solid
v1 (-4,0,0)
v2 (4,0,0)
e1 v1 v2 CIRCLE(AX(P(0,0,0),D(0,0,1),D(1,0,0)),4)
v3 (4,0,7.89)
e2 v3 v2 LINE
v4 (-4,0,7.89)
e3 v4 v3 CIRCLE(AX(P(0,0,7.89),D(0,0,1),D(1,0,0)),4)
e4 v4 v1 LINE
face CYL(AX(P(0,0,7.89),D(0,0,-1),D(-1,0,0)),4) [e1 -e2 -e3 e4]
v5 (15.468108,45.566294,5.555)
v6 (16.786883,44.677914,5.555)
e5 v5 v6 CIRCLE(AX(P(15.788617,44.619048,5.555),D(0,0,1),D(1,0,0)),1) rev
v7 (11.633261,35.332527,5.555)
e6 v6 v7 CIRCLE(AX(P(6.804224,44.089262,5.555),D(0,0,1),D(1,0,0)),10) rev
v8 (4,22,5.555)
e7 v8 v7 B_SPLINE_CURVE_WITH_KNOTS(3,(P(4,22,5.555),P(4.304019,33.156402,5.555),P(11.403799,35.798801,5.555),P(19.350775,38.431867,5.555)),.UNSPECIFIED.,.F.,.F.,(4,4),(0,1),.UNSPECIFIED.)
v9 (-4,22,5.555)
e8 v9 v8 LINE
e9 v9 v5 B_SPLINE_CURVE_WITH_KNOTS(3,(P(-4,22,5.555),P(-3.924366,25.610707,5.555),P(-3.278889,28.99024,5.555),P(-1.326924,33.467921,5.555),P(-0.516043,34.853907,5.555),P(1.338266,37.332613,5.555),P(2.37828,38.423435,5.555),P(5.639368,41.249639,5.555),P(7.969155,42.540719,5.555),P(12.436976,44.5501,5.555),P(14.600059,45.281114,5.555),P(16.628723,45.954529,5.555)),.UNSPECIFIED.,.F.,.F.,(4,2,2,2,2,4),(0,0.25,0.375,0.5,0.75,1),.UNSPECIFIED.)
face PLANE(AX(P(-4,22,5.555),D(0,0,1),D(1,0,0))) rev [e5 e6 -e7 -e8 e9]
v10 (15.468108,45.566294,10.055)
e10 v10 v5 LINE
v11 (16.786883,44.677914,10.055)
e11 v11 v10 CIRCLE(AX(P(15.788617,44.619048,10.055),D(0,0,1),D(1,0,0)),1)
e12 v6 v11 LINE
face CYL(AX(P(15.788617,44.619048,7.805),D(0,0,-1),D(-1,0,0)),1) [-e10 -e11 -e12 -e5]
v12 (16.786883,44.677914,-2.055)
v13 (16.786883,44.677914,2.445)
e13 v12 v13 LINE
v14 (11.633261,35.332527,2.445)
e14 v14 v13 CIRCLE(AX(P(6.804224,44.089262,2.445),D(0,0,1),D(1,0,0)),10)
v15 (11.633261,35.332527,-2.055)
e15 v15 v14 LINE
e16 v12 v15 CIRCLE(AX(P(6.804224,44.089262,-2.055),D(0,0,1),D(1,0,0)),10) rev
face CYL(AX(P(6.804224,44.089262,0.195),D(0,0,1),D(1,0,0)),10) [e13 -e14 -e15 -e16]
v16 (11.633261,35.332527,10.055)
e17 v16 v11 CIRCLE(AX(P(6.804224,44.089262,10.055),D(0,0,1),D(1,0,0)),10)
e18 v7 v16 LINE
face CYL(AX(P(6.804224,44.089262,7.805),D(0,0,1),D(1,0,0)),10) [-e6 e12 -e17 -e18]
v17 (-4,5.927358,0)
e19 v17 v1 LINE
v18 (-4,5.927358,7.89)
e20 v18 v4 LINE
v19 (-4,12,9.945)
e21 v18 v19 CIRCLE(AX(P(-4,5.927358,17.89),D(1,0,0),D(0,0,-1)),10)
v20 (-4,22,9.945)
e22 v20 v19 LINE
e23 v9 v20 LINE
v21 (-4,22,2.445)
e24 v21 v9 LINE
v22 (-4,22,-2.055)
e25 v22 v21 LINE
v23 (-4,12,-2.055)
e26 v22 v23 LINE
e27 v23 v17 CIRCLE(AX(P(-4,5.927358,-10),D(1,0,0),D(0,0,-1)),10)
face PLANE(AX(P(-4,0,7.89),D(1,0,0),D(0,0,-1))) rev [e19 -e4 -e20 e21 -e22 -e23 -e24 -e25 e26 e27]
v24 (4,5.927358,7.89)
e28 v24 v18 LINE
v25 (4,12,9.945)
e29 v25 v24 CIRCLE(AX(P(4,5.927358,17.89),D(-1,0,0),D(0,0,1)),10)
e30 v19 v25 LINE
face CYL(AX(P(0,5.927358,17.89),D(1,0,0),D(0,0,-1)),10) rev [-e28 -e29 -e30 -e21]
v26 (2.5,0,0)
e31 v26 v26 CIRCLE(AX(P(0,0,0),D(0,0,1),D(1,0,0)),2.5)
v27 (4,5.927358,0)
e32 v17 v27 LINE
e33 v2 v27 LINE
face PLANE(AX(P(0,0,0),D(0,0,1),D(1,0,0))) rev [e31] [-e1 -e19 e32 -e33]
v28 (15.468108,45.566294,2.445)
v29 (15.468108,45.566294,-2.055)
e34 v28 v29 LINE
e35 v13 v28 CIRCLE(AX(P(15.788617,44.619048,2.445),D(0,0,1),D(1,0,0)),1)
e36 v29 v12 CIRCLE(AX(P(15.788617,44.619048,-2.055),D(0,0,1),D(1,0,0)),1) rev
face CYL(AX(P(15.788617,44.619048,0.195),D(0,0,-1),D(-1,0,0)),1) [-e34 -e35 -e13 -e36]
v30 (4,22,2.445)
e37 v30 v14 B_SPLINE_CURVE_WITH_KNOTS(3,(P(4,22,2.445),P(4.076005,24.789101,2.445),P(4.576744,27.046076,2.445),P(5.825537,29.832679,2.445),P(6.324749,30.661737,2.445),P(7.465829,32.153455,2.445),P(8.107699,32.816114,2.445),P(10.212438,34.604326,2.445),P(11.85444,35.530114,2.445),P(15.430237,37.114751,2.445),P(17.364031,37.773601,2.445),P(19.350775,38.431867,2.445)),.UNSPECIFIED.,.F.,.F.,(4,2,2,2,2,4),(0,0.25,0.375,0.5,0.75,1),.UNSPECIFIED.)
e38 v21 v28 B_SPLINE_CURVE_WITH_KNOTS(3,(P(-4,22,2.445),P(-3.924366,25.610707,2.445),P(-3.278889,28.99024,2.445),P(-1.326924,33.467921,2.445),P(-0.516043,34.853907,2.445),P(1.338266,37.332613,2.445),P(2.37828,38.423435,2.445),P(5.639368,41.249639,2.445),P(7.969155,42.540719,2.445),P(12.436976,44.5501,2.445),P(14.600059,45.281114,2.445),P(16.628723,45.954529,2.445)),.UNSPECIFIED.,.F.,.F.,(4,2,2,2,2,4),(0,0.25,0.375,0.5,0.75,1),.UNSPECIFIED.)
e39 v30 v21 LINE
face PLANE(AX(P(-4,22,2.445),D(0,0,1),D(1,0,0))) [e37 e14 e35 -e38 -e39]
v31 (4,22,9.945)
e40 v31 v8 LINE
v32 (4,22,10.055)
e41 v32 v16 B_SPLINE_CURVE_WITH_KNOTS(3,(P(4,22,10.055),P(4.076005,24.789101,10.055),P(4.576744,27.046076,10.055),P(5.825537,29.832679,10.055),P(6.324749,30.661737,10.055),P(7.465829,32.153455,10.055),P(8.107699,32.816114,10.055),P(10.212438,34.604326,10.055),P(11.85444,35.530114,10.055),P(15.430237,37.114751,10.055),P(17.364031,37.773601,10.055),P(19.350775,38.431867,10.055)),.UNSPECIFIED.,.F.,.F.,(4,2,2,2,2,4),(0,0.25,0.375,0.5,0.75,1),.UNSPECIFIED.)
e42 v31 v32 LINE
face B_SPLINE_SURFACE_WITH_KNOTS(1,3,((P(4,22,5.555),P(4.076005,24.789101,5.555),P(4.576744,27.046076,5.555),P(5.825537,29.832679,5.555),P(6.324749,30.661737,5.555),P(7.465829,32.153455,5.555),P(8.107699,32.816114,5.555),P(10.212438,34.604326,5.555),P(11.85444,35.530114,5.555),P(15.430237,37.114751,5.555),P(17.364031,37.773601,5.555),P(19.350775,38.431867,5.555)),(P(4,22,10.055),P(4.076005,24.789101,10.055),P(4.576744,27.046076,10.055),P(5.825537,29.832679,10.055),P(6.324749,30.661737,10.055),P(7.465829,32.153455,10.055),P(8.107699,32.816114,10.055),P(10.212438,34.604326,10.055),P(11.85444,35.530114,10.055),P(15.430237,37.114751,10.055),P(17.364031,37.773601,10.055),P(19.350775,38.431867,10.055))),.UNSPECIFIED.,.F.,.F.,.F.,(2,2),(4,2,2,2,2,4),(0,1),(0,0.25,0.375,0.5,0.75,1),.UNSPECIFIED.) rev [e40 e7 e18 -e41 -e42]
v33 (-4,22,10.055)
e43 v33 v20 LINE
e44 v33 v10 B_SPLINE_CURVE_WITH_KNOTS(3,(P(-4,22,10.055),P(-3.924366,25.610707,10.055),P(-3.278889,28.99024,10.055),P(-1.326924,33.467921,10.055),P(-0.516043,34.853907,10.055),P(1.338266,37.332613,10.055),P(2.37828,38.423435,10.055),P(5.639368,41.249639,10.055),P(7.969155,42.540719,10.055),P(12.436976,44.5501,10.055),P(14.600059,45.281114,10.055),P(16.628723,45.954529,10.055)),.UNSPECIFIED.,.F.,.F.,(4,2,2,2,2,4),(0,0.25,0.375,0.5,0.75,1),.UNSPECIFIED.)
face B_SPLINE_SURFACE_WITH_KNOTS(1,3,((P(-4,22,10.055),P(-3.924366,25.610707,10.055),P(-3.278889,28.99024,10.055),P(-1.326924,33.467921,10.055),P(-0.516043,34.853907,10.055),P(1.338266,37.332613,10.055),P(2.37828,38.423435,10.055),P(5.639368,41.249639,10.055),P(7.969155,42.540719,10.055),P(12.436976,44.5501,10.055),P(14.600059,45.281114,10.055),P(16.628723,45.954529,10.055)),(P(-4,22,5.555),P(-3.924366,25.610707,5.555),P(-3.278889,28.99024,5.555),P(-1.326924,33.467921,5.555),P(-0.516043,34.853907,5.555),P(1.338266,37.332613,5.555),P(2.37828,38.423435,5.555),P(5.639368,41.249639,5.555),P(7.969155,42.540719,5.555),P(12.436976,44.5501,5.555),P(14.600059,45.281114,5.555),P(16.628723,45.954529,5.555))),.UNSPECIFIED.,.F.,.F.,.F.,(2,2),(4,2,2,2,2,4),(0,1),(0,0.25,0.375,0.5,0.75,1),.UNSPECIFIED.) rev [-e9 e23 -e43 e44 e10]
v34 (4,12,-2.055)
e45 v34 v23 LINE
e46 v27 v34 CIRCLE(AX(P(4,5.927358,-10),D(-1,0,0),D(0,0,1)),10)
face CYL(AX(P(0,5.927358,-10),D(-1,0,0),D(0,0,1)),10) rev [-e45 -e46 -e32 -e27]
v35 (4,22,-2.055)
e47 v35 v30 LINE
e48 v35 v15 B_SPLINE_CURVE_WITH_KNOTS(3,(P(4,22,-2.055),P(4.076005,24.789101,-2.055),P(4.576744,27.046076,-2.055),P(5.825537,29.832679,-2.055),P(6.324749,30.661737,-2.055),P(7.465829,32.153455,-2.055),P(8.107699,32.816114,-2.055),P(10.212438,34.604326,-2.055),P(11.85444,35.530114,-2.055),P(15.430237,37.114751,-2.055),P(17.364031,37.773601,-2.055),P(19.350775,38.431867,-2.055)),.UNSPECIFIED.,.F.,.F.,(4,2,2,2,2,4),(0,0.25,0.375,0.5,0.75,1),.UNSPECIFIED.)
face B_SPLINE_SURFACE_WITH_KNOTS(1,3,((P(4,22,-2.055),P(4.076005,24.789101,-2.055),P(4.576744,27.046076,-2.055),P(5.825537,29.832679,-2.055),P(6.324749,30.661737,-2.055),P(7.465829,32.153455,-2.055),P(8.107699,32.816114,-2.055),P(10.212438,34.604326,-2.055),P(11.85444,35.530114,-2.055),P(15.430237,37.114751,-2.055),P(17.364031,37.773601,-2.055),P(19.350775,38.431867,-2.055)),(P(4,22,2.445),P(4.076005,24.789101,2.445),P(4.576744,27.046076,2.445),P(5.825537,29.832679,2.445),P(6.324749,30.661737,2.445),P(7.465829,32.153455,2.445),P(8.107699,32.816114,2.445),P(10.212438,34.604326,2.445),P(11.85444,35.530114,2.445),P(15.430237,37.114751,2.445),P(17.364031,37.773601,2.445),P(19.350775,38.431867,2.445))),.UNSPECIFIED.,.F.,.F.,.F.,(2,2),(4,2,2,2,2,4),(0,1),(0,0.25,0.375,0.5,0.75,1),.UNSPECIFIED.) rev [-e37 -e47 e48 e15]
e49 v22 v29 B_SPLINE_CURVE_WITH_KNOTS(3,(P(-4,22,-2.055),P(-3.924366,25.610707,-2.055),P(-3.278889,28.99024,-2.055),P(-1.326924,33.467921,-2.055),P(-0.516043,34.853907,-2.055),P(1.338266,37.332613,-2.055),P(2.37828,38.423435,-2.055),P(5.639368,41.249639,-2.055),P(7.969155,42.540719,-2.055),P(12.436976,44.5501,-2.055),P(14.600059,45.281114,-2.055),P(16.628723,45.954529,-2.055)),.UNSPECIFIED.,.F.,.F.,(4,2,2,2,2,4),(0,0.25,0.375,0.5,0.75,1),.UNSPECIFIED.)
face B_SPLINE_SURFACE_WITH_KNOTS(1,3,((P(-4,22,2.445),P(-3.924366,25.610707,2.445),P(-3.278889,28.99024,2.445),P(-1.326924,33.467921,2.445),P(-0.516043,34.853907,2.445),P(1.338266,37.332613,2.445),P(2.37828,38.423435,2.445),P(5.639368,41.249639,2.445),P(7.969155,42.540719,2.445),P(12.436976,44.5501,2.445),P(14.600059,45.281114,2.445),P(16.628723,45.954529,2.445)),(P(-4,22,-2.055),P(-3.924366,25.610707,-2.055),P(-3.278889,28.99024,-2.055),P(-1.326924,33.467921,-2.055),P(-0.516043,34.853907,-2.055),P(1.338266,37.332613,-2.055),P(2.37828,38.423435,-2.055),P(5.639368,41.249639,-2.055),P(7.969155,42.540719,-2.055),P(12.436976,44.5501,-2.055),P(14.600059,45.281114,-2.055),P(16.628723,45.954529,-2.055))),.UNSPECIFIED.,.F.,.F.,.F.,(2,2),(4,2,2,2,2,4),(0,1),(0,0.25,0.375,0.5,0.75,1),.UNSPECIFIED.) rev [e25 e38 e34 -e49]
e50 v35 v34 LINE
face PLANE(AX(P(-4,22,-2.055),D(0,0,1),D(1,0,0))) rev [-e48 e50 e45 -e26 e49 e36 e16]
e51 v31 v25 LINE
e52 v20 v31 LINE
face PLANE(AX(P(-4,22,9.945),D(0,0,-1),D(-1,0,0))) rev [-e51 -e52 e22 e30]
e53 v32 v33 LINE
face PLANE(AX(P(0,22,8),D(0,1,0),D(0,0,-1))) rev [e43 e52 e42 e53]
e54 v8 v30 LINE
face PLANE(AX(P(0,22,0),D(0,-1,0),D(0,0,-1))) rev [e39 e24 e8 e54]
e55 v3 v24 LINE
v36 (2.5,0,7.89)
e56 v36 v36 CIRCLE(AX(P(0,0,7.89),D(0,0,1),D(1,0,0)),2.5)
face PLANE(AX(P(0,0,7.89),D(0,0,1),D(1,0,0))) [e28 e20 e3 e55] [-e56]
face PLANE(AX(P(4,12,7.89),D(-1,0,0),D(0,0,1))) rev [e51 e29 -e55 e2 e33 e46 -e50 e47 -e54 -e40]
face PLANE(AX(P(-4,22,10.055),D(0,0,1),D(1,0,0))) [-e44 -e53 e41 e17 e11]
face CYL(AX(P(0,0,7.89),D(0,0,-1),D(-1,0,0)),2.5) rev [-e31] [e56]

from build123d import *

# Parameters (mm, degrees)
ESBO_O3_R                = 2.5
RESSALTO_EXTRUS_O1_DEPTH = 7.89
ESBO_O4_W                = 8
ESBO_O4_H                = 12
RESSALTO_EXTRUS_O2_DEPTH = 10
FILETE1_R                = 10
VARREDURA1_START         = -2.055
VARREDURA1_DEPTH         = 4.5
FILETE2_R                = 10
FILETE3_R                = 1
FILETE2_OF_ESPELHAR1_R   = 10
FILETE3_OF_ESPELHAR1_R   = 1


# Read off the part's stored shape, not the designer's step: Varredura1
with BuildPart() as part:
    # Esboço3 → Ressalto-extrusão1 (new body)
    with BuildSketch(Plane.XY):
        with BuildLine():
            Line((-4, 0), (-4, 12))
            Line((-4, 12), (4, 12))
            Line((4, 12), (4, 0))
            ThreePointArc((4, 0), (0, -4), (-4, 0))
        make_face()
        Circle(ESBO_O3_R, mode=Mode.SUBTRACT)
    extrude(amount=RESSALTO_EXTRUS_O1_DEPTH)

    # Esboço4 → Ressalto-extrusão2 (add)
    with BuildSketch(Plane(origin=(0, 12, 0), x_dir=(1, 0, 0), z_dir=(0, 1, 0))):
        with Locations((0, -3.945)):
            Rectangle(ESBO_O4_W, ESBO_O4_H)
    extrude(amount=RESSALTO_EXTRUS_O2_DEPTH)

    # Filete1
    # the kernel refuses this fillet: 10 mm, written as the material it adds along each edge
    with BuildSketch(Plane(origin=(-4, 12, 0), x_dir=(0, 0, -1), z_dir=(1, 0, 0))) as filete1_piece_1:
        with BuildLine():
            CenterArc((10, -6.072641517), FILETE1_R, 142.608054869, 37.391945131)
            Line((0, -6.072641517), (-0.2, -6.072641517))
            Line((-0.2, -6.072641517), (-0.2, 0))
            Line((-0.2, 0), (0, 0.2))
            ThreePointArc((0, 0.2), (1.0275, 0.2), (1.8961, 0.12145283))
            Line((1.8961, 0.12145283), (2.055, 0))
        make_face()
    extrude(amount=8)
    with BuildSketch(Plane(origin=(-4, 12, 7.89), x_dir=(0, 0, 1), z_dir=(1, 0, 0))) as filete1_piece_2:
        with BuildLine():
            CenterArc((10, 6.072641517), FILETE1_R, 180, 37.391945131)
            Line((0, 6.072641517), (-0.2, 6.072641517))
            Line((-0.2, 6.072641517), (-0.2, 0))
            Line((-0.2, 0), (0, -0.2))
            ThreePointArc((0, -0.2), (1.0275, -0.2), (1.8961, -0.12145283))
            Line((1.8961, -0.12145283), (2.055, 0))
        make_face()
    extrude(amount=8)

    # Varredura1 outline → Varredura1 (add)
    with BuildSketch(Plane.XY.offset(VARREDURA1_START)):
        with BuildLine():
            Line((-4, 22), (4, 22))
            add(Edge.make_bspline(
                [(4, 22), (4.076004643, 24.789100523), (4.576744422, 27.046075873), (5.825537248, 29.832679333), (6.324748717, 30.661737223), (7.465829447, 32.153454516), (8.107698711, 32.816113914), (10.212438301, 34.604326425), (11.854440436, 35.53011384), (15.430236778, 37.114751087), (17.364030989, 37.773600914), (19.350774872, 38.4318674)],
                knots=[0, 0, 0, 0, 0.25, 0.25, 0.375, 0.375, 0.5, 0.5, 0.75, 0.75, 1, 1, 1, 1], degree=3))
            Line((19.350774872, 38.4318674), (16.628722538, 45.954528571))
            add(Edge.make_bspline(
                [(-4, 22), (-3.924365702, 25.610706729), (-3.278889097, 28.990240165), (-1.326924275, 33.467921051), (-0.516042652, 34.853906552), (1.338266133, 37.332612564), (2.378280036, 38.423434753), (5.639368368, 41.249638523), (7.969155498, 42.540719328), (12.436975606, 44.550100168), (14.600059443, 45.281114301), (16.628722538, 45.954528571)],
                knots=[0, 0, 0, 0, 0.25, 0.25, 0.375, 0.375, 0.5, 0.5, 0.75, 0.75, 1, 1, 1, 1], degree=3))
        make_face()
    varredura1 = extrude(amount=VARREDURA1_DEPTH)

    # Filete2
    # the kernel refuses this fillet: 10 mm, written as the material it takes off along each edge
    with BuildSketch(Plane(origin=(19.350774872, 38.4318674, -22.846513703), x_dir=(-0.9279643931477312, -0.3726688678303612, 8.125821655605385e-13), z_dir=(0, 2.1804401593599865e-12, 1.0))) as filete2_piece_1:
        with BuildLine():
            CenterArc((9.534418095, -9.925569628), FILETE2_R, 96.994915397, 71.874930906)
            Line((-0.277493979, -7.99518587), (-0.473732221, -7.956578195))
            ThreePointArc((-0.473732221, -7.956578195), (-0.338626636, -3.990655585), (-0.199879647, 0.006937349))
            Line((-0.199879647, 0.006937349), (0.012379593, 0.199616497))
            ThreePointArc((0.012379593, 0.199616497), (4.158510673, 0.013875219), (8.292249229, 0.198511393))
            Line((8.292249229, 0.198511393), (8.316605481, 0))
        make_face()
    extrude(amount=46.083027405, mode=Mode.SUBTRACT)

    # Filete3
    filete3_edges = [part.edges().sort_by_distance(p)[0] for p in [
        (16.628722538, 45.954528571, 0.195),
    ]]
    fillet(filete3_edges, radius=FILETE3_R)

    # Espelhar1: Varredura1 across plane
    add(varredura1.mirror(Plane.XY.offset(4)))

    # Filete2 of Espelhar1
    # the kernel refuses this fillet: 10 mm, written as the material it takes off along each edge
    with BuildSketch(Plane(origin=(19.350774872, 38.4318674, 30.846513703), x_dir=(-0.34025654174280723, 0.9403326463551213, 2.0503390652699583e-12), z_dir=(0, 2.1804401593599865e-12, -1.0))) as filete2_of_espelhar1_piece_1:
        with BuildLine():
            CenterArc((9.588878802, -9.87296633), FILETE2_OF_ESPELHAR1_R, 99.142350717, 71.874930906)
            Line((-0.288475994, -8.311600828), (-0.48602309, -8.280373518))
            ThreePointArc((-0.48602309, -8.280373518), (-0.158112079, -4.155526935), (-0.199925782, -0.005448096))
            Line((-0.199925782, -0.005448096), (0, 0.2))
            ThreePointArc((0, 0.2), (4, 0.2), (7.968222424, 0.197459327))
            Line((7.968222424, 0.197459327), (8, 0))
        make_face()
    extrude(amount=46.083027405, mode=Mode.SUBTRACT)

    # Filete3 of Espelhar1
    filete3_of_espelhar1_edges = [part.edges().sort_by_distance(p)[0] for p in [
        (16.628722538, 45.954528571, 7.805),
    ]]
    fillet(filete3_of_espelhar1_edges, radius=FILETE3_OF_ESPELHAR1_R)


solid = part.part
